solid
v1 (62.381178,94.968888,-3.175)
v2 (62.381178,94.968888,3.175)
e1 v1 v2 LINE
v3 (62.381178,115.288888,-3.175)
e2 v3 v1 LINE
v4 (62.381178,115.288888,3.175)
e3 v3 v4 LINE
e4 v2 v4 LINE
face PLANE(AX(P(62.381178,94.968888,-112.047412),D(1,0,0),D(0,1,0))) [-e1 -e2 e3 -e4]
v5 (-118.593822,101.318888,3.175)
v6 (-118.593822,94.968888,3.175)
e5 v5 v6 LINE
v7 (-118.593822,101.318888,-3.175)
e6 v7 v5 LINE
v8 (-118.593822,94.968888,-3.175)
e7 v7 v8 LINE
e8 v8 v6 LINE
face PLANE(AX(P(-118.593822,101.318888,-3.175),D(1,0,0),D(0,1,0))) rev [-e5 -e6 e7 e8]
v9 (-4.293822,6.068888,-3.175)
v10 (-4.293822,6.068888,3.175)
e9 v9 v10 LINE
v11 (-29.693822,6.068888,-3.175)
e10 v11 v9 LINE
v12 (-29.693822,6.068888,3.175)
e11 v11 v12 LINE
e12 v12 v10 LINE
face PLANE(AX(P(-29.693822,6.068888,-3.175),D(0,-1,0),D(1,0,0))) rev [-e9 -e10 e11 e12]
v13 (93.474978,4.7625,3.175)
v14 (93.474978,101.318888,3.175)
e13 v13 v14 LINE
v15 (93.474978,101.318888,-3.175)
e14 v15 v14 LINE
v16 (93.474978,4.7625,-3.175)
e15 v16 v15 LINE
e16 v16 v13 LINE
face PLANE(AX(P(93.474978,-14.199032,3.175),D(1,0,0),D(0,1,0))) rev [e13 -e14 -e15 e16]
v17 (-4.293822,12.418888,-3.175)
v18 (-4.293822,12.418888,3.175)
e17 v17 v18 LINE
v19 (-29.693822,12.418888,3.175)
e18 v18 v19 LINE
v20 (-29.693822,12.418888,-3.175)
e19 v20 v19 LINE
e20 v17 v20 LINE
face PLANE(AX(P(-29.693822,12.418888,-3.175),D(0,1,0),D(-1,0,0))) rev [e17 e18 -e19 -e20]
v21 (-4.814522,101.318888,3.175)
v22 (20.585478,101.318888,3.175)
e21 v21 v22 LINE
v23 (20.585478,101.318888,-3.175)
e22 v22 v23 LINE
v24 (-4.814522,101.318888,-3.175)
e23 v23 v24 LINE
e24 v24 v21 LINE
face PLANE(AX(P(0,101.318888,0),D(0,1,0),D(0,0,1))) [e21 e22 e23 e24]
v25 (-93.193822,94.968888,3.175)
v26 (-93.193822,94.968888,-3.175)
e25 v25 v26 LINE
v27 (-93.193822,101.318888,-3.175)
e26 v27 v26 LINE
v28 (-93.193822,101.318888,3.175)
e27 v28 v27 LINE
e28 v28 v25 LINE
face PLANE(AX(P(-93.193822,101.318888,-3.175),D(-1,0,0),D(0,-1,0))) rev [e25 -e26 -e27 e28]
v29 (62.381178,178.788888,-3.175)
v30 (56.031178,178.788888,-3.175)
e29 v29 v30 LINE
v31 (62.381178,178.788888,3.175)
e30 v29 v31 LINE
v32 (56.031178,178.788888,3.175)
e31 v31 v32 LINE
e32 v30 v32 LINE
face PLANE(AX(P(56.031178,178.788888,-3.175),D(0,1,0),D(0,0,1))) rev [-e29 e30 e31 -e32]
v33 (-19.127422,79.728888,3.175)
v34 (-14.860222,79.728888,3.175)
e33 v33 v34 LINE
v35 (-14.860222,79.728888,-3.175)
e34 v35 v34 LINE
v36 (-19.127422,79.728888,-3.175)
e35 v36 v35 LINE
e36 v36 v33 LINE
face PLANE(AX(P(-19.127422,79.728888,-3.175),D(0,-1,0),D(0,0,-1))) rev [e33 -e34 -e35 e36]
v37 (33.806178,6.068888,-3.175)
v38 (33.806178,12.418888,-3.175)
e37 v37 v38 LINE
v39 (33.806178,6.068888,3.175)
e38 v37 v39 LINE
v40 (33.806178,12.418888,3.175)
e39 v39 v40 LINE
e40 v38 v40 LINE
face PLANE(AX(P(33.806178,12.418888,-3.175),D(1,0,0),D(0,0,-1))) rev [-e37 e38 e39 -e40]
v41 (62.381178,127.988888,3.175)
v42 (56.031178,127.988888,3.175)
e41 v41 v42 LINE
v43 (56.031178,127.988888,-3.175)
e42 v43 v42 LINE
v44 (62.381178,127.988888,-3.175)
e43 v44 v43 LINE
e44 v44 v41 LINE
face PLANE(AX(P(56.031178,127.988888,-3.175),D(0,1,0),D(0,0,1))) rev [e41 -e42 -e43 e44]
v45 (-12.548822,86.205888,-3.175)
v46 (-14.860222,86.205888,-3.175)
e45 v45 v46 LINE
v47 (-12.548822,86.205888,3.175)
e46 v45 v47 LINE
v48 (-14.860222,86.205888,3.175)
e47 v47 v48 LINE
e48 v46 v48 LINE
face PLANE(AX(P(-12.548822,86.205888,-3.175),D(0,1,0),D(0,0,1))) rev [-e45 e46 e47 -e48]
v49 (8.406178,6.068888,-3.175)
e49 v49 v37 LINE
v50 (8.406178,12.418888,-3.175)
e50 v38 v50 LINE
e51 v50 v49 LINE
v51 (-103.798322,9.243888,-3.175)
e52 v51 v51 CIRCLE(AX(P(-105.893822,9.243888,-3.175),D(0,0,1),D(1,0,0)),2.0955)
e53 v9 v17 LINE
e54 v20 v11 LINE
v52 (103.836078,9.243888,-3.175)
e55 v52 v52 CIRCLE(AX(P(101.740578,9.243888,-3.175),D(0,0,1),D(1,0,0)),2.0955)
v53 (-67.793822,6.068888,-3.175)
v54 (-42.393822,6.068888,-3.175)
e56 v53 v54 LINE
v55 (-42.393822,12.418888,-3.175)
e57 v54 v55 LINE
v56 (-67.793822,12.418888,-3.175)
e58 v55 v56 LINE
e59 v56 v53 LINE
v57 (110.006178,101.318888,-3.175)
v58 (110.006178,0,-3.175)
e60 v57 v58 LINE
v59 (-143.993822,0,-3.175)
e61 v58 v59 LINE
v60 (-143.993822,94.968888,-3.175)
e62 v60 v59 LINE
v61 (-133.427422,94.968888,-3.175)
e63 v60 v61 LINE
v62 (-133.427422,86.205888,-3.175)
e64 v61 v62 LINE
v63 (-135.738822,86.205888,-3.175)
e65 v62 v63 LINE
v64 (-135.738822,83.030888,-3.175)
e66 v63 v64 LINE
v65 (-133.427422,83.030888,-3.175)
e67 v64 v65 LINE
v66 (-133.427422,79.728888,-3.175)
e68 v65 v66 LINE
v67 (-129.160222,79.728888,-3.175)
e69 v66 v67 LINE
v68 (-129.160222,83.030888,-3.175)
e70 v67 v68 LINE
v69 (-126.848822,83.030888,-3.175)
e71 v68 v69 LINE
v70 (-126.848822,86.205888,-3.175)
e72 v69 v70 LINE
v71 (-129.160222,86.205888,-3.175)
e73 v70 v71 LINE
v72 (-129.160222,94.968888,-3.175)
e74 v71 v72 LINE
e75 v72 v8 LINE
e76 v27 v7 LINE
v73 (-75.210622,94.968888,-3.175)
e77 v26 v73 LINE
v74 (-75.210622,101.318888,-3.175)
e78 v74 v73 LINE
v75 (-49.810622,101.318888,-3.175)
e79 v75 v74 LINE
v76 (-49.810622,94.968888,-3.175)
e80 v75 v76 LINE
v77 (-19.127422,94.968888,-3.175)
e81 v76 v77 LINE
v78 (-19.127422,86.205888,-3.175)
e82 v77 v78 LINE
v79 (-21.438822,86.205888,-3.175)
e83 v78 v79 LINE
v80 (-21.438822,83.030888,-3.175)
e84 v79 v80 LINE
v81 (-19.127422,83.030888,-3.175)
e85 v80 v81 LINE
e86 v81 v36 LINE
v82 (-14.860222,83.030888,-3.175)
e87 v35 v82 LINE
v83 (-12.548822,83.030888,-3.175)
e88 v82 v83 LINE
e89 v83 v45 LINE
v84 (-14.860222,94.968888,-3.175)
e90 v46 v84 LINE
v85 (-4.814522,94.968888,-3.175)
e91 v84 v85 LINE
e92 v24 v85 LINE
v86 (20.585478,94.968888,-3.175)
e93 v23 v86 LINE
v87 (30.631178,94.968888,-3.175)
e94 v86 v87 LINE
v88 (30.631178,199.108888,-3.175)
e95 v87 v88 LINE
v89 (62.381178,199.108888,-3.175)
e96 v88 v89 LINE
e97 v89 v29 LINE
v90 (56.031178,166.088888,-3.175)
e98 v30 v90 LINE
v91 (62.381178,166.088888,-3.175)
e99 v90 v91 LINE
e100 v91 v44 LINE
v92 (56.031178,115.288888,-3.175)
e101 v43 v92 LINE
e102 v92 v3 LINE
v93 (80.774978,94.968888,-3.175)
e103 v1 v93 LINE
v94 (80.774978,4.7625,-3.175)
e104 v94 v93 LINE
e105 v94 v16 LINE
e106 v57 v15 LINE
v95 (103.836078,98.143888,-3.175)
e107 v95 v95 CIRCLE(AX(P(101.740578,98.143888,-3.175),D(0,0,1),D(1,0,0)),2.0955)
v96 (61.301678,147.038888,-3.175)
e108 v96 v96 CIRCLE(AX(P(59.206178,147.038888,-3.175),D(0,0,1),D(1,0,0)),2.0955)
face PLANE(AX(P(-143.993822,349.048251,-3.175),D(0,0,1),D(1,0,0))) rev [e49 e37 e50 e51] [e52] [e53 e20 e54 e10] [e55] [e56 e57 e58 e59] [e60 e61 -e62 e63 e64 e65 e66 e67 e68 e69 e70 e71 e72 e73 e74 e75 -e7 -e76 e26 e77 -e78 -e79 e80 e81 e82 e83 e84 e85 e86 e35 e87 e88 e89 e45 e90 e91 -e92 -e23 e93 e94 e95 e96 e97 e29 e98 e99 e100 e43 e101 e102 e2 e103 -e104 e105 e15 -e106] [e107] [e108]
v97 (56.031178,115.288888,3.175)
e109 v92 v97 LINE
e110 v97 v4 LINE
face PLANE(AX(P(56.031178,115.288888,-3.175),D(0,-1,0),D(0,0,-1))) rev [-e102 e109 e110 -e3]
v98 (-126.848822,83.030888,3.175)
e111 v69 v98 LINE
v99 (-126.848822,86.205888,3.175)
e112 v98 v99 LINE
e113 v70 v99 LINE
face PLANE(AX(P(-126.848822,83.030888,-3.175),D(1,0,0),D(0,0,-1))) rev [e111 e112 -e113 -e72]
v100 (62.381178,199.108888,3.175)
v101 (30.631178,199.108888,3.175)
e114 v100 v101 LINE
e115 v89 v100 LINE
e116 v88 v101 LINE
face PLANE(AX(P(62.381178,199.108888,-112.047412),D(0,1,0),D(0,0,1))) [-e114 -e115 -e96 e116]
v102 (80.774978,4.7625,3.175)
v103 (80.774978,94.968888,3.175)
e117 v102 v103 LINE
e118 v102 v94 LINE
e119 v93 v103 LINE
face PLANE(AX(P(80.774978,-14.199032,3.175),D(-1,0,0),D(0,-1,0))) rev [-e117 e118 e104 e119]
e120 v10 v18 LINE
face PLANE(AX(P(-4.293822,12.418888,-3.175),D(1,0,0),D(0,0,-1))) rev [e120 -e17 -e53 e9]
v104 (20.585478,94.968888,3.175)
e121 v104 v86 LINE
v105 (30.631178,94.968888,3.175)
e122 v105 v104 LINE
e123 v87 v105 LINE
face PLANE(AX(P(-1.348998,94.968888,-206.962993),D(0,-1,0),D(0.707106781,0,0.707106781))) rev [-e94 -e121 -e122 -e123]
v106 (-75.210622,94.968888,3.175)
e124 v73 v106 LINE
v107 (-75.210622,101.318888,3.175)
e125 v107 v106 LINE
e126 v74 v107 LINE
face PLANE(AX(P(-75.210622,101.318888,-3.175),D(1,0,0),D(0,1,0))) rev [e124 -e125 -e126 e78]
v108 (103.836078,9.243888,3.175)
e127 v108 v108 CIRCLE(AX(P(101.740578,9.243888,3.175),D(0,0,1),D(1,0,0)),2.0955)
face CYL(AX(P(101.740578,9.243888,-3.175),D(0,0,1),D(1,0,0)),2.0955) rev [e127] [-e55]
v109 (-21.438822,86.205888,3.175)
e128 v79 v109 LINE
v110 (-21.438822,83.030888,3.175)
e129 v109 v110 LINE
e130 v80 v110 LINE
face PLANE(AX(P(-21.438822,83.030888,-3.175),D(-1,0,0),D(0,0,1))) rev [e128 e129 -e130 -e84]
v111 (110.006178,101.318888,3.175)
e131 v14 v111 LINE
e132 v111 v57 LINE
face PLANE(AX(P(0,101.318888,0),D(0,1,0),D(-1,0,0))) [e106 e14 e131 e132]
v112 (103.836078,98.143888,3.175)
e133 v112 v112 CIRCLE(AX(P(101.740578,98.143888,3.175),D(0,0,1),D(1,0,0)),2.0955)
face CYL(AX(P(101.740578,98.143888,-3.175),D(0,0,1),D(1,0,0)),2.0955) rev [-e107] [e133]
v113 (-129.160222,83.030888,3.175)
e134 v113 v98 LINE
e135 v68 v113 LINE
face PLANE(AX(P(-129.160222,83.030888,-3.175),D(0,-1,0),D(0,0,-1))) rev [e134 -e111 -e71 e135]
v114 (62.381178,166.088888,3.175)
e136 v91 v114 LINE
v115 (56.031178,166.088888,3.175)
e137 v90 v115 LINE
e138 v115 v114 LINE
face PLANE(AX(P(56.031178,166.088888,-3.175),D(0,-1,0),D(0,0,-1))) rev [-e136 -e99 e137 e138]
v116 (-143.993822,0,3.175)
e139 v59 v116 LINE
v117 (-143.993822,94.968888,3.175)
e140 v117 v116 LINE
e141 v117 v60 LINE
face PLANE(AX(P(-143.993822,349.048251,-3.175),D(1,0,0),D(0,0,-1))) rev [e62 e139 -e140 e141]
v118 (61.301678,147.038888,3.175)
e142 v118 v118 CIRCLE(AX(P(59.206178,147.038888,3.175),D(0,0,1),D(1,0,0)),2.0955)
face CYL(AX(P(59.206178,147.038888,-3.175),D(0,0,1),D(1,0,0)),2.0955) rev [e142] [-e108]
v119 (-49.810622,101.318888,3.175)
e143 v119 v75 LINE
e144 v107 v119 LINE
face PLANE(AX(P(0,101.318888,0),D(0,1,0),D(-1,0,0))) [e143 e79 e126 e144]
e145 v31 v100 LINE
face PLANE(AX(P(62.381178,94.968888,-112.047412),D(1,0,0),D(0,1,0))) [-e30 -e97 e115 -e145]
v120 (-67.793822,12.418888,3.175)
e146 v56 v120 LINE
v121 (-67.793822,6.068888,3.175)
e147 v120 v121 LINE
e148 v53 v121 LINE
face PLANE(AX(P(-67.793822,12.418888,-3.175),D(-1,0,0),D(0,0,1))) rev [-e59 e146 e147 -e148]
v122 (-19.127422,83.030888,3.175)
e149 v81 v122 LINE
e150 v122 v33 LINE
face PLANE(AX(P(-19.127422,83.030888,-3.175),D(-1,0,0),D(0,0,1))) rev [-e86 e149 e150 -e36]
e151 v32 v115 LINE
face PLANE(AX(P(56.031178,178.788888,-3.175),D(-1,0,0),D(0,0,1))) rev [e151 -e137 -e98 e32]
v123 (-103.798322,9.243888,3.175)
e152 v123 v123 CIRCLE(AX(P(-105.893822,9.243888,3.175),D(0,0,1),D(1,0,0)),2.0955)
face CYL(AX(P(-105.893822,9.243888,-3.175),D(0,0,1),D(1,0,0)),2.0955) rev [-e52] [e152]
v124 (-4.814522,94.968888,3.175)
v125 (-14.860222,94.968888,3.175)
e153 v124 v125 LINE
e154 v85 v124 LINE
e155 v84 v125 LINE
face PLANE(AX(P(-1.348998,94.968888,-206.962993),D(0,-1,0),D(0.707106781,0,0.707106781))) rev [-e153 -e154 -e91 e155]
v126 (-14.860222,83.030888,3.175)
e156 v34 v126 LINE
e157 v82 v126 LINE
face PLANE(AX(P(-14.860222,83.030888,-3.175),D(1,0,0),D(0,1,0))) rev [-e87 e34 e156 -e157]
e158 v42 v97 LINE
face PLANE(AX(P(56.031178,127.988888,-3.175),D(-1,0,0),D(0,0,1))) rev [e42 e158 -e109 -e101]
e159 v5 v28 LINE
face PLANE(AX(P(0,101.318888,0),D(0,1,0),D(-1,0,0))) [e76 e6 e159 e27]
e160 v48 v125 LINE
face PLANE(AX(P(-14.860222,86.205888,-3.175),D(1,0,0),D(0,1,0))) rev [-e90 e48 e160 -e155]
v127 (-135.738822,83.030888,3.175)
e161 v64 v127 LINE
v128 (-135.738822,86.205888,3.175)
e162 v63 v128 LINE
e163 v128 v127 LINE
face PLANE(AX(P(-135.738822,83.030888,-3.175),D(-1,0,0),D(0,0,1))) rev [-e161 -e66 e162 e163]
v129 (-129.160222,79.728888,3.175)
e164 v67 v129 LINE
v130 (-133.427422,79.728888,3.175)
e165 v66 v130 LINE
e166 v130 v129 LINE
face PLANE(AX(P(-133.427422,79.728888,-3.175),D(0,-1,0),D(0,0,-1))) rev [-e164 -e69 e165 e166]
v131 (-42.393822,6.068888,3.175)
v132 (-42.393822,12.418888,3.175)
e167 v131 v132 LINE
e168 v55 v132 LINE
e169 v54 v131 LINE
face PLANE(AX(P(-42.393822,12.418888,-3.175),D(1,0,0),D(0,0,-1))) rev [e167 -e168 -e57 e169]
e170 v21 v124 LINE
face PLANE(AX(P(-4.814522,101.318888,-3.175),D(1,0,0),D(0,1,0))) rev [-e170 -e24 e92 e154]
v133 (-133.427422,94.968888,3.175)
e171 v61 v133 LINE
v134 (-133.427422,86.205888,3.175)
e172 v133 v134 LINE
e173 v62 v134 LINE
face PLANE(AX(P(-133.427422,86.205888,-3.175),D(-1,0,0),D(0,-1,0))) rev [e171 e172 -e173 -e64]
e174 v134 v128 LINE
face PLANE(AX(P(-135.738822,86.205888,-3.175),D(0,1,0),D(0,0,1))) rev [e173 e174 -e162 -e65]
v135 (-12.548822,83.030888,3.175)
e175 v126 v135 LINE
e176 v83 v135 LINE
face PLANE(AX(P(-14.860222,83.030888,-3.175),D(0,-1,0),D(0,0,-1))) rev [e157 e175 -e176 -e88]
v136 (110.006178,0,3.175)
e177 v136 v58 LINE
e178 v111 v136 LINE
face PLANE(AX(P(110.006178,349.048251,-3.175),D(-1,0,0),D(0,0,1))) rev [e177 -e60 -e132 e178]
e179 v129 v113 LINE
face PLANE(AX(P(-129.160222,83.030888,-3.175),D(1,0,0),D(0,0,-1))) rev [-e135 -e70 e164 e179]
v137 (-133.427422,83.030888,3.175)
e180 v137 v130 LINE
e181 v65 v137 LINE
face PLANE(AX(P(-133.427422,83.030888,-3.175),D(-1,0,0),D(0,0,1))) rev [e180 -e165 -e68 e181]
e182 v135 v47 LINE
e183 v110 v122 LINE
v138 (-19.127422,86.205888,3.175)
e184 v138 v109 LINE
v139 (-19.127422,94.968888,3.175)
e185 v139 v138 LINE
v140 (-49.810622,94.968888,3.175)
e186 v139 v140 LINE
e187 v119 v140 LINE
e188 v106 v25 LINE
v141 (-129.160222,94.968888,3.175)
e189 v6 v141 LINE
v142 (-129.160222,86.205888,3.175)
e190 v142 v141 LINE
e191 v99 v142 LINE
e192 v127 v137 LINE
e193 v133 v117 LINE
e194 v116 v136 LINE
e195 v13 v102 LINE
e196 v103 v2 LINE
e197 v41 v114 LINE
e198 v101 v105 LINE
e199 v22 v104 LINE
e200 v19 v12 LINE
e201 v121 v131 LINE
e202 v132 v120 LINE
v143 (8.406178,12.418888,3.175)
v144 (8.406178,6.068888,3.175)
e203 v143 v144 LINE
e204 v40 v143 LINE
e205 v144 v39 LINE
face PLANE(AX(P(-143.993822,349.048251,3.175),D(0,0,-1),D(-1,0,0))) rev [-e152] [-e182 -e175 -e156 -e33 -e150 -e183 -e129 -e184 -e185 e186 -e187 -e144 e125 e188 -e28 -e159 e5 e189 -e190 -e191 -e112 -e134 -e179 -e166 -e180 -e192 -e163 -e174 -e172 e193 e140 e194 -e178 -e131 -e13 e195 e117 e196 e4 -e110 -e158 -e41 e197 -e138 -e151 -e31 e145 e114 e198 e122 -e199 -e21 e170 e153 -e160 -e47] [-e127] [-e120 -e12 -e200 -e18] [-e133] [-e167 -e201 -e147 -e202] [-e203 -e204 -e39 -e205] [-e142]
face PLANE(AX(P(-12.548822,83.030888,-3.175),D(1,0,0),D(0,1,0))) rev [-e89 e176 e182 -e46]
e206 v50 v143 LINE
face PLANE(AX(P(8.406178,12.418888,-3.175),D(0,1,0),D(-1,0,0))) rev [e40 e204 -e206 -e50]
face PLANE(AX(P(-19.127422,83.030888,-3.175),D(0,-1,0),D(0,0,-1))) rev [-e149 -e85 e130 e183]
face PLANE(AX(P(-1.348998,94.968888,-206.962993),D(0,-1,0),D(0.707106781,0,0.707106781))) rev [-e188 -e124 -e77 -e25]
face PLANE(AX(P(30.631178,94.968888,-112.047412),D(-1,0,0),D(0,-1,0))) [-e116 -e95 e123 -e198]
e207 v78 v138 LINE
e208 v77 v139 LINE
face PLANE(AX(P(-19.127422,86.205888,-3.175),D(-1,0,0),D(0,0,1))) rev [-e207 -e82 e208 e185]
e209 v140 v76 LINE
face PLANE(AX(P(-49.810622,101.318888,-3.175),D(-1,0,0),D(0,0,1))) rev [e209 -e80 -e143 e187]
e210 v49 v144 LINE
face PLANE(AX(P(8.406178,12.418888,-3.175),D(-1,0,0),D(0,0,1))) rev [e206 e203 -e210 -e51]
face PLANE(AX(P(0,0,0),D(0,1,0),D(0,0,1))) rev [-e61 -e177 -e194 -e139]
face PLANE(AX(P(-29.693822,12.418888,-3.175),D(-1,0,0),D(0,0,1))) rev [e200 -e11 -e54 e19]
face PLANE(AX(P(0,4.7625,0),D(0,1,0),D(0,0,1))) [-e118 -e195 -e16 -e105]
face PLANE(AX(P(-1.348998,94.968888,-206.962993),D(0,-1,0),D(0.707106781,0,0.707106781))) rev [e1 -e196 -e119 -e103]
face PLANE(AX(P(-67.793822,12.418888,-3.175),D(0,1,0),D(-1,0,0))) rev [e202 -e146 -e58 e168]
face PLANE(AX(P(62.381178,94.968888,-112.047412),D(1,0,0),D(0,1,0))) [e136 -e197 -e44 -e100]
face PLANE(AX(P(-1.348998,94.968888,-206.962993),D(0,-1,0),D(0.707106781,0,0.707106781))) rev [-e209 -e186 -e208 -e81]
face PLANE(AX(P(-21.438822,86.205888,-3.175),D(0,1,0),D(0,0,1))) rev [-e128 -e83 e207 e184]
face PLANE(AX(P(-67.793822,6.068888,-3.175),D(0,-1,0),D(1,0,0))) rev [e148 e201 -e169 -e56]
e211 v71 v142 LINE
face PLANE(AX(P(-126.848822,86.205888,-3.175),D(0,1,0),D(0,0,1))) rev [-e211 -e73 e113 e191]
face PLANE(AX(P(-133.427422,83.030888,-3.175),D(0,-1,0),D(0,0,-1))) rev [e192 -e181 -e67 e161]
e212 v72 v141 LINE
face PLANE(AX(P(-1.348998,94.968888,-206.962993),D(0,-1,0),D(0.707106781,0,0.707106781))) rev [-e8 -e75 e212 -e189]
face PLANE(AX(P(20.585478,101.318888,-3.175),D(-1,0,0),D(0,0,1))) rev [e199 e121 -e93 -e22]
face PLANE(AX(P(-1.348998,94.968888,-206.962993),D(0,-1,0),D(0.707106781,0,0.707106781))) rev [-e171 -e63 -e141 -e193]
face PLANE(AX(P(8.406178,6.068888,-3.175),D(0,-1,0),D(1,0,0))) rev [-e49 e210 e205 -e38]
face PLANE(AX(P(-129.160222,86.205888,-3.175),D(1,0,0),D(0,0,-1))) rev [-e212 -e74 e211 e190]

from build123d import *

# Parameters (mm, degrees)
SKETCH1_W                       = 254
SKETCH1_H                       = 6.35
BASE_EXTRUSION_DEPTH            = 94.968888282
SKETCH4_W                       = 25.4
SKETCH4_H                       = 6.35
TAB_HOLES_TO_CHASSIS_BASE_DEPTH = 173.608322449
T_SLOT_CENTER_DEPTH             = 173.608322449
SKETCH6_W                       = 31.75
SKETCH6_H                       = 104.14
ARM_SUPPORT_DEPTH               = 6.35
SKETCH8_W                       = 12.7
SKETCH8_H                       = 6.35
ARM_CLEARANCE_DEPTH             = 90.206388282
SKETCH9_R                       = 2.0955
BASE_MOUNTING_HOLE_1_DEPTH      = 246.802548054
SKETCH10_R                      = 2.0955
BASE_MOUNTING_HOLE_2_DEPTH      = 246.802548054
SKETCH11_R                      = 2.0955
ARM_SUPPORT_MOUNTING_HOLE_DEPTH = 246.802548054
SKETCH12_W                      = 6.35
SKETCH12_H                      = 12.7
ARM_SUPPORT_TAB_SLOTS_DEPTH     = 246.802548054
T_START                         = -6.35
T_SLOT_TOP_CORNER_DEPTH         = 6.35
T_SLOT_TOP_CORNER_2_OUTLINE_W   = 25.4
T_SLOT_TOP_CORNER_2_OUTLINE_H   = 6.35
T_SLOT_TOP_CORNER_2_OUTLINE_W_2 = 16.5312
T_SLOT_TOP_CORNER_2_DEPTH       = 6.35
SKETCH15_R                      = 2.0955
CUT_EXTRUDE8_DEPTH              = 246.802548054


# Read off the part's stored shape, not the designer's step: T Slot Top Corner
with BuildPart() as part:
    # Sketch1 → Base Extrusion (new body)
    with BuildSketch(Plane(origin=(0, 0, 0), x_dir=(1, 0, 0), z_dir=(0, 1, 0))):
        with Locations((-16.993821871, 0)):
            Rectangle(SKETCH1_W, SKETCH1_H)
    extrude(amount=BASE_EXTRUSION_DEPTH)

    # Sketch4 → Tab Holes to Chassis Base (cut, through all)
    with BuildSketch(Plane.XY.offset(3.175)):
        with Locations((-55.093821871, 9.243888282)):
            Rectangle(SKETCH4_W, SKETCH4_H)
        with Locations((-16.993821871, 9.243888282)):
            Rectangle(SKETCH4_W, SKETCH4_H)
        with Locations((21.106178129, 9.243888282)):
            Rectangle(SKETCH4_W, SKETCH4_H)
    extrude(amount=-TAB_HOLES_TO_CHASSIS_BASE_DEPTH, mode=Mode.SUBTRACT)

    # Sketch5 → T Slot Center (cut, through all)
    with BuildSketch(Plane.XY.offset(3.175)):
        Polygon((-14.860221871, 94.968888282), (-19.127421871, 94.968888282), (-19.127421871, 86.205888282), (-21.438821871, 86.205888282), (-21.438821871, 83.030888282), (-19.127421871, 83.030888282), (-19.127421871, 79.728888282), (-14.860221871, 79.728888282), (-14.860221871, 83.030888282), (-12.548821871, 83.030888282), (-12.548821871, 86.205888282), (-14.860221871, 86.205888282), align=None)
    extrude(amount=-T_SLOT_CENTER_DEPTH, mode=Mode.SUBTRACT)

    # Sketch6 → Arm Support (add)
    with BuildSketch(Plane.XY.offset(3.175)):
        with Locations((46.506178129, 147.038888282)):
            Rectangle(SKETCH6_W, SKETCH6_H)
    extrude(amount=-ARM_SUPPORT_DEPTH)

    # Sketch8 → Arm Clearance (cut)
    with BuildSketch(Plane(origin=(0, 94.968888282, 0), x_dir=(1, 0, 0), z_dir=(0, 1, 0))):
        with Locations((87.124978129, 0)):
            Rectangle(SKETCH8_W, SKETCH8_H)
    extrude(amount=-ARM_CLEARANCE_DEPTH, mode=Mode.SUBTRACT)

    # Sketch9 → Base Mounting Hole 1 (cut, through all)
    with BuildSketch(Plane.XY.offset(3.175)):
        with Locations((101.740578129, 9.243888282)):
            Circle(SKETCH9_R)
    extrude(amount=-BASE_MOUNTING_HOLE_1_DEPTH, mode=Mode.SUBTRACT)

    # Sketch10 → Base Mounting Hole 2 (cut, through all)
    with BuildSketch(Plane.XY.offset(3.175)):
        with Locations((-105.893821871, 9.243888282)):
            Circle(SKETCH10_R)
    extrude(amount=-BASE_MOUNTING_HOLE_2_DEPTH, mode=Mode.SUBTRACT)

    # Sketch11 → Arm Support Mounting Hole (cut, through all)
    with BuildSketch(Plane.XY.offset(3.175)):
        with Locations((59.206178129, 147.038888282)):
            Circle(SKETCH11_R)
    extrude(amount=-ARM_SUPPORT_MOUNTING_HOLE_DEPTH, mode=Mode.SUBTRACT)

    # Sketch12 → Arm Support Tab Slots (cut, through all)
    with BuildSketch(Plane.XY.offset(3.175)):
        with Locations((59.206178129, 172.438888282)):
            Rectangle(SKETCH12_W, SKETCH12_H)
        with Locations((59.206178129, 121.638888282)):
            Rectangle(SKETCH12_W, SKETCH12_H)
    extrude(amount=-ARM_SUPPORT_TAB_SLOTS_DEPTH, mode=Mode.SUBTRACT)

    # T Slot Top Corner outline → T Slot Top Corner (cut)
    with BuildSketch(Plane.XY.offset(3.175).offset(T_START)):
        Polygon((-126.848821871, 83.030888282), (-126.848821871, 86.205888282), (-129.160221871, 86.205888282), (-129.160221871, 94.968888282), (-133.427421871, 94.968888282), (-133.427421871, 86.205888282), (-135.738821871, 86.205888282), (-135.738821871, 83.030888282), (-133.427421871, 83.030888282), (-133.427421871, 79.728888282), (-129.160221871, 79.728888282), (-129.160221871, 83.030888282), align=None)
    extrude(amount=T_SLOT_TOP_CORNER_DEPTH, mode=Mode.SUBTRACT)

    # T Slot Top Corner 2 outline → T Slot Top Corner 2 (add)
    with BuildSketch(Plane.XY.offset(3.175).offset(T_START)):
        with Locations((-62.510621871, 98.143888282)):
            Rectangle(T_SLOT_TOP_CORNER_2_OUTLINE_W, T_SLOT_TOP_CORNER_2_OUTLINE_H)
        with Locations((-105.893821871, 98.143888282)):
            Rectangle(T_SLOT_TOP_CORNER_2_OUTLINE_W, T_SLOT_TOP_CORNER_2_OUTLINE_H)
        with Locations((101.740578129, 98.143888282)):
            Rectangle(T_SLOT_TOP_CORNER_2_OUTLINE_W_2, T_SLOT_TOP_CORNER_2_OUTLINE_H)
        with Locations((7.885478129, 98.143888282)):
            Rectangle(T_SLOT_TOP_CORNER_2_OUTLINE_W, T_SLOT_TOP_CORNER_2_OUTLINE_H)
    extrude(amount=T_SLOT_TOP_CORNER_2_DEPTH)

    # Sketch15 → Cut-Extrude8 (cut, through all)
    with BuildSketch(Plane.XY.offset(3.175)):
        with Locations((101.740578129, 98.143888282)):
            Circle(SKETCH15_R)
    extrude(amount=-CUT_EXTRUDE8_DEPTH, mode=Mode.SUBTRACT)


solid = part.part
